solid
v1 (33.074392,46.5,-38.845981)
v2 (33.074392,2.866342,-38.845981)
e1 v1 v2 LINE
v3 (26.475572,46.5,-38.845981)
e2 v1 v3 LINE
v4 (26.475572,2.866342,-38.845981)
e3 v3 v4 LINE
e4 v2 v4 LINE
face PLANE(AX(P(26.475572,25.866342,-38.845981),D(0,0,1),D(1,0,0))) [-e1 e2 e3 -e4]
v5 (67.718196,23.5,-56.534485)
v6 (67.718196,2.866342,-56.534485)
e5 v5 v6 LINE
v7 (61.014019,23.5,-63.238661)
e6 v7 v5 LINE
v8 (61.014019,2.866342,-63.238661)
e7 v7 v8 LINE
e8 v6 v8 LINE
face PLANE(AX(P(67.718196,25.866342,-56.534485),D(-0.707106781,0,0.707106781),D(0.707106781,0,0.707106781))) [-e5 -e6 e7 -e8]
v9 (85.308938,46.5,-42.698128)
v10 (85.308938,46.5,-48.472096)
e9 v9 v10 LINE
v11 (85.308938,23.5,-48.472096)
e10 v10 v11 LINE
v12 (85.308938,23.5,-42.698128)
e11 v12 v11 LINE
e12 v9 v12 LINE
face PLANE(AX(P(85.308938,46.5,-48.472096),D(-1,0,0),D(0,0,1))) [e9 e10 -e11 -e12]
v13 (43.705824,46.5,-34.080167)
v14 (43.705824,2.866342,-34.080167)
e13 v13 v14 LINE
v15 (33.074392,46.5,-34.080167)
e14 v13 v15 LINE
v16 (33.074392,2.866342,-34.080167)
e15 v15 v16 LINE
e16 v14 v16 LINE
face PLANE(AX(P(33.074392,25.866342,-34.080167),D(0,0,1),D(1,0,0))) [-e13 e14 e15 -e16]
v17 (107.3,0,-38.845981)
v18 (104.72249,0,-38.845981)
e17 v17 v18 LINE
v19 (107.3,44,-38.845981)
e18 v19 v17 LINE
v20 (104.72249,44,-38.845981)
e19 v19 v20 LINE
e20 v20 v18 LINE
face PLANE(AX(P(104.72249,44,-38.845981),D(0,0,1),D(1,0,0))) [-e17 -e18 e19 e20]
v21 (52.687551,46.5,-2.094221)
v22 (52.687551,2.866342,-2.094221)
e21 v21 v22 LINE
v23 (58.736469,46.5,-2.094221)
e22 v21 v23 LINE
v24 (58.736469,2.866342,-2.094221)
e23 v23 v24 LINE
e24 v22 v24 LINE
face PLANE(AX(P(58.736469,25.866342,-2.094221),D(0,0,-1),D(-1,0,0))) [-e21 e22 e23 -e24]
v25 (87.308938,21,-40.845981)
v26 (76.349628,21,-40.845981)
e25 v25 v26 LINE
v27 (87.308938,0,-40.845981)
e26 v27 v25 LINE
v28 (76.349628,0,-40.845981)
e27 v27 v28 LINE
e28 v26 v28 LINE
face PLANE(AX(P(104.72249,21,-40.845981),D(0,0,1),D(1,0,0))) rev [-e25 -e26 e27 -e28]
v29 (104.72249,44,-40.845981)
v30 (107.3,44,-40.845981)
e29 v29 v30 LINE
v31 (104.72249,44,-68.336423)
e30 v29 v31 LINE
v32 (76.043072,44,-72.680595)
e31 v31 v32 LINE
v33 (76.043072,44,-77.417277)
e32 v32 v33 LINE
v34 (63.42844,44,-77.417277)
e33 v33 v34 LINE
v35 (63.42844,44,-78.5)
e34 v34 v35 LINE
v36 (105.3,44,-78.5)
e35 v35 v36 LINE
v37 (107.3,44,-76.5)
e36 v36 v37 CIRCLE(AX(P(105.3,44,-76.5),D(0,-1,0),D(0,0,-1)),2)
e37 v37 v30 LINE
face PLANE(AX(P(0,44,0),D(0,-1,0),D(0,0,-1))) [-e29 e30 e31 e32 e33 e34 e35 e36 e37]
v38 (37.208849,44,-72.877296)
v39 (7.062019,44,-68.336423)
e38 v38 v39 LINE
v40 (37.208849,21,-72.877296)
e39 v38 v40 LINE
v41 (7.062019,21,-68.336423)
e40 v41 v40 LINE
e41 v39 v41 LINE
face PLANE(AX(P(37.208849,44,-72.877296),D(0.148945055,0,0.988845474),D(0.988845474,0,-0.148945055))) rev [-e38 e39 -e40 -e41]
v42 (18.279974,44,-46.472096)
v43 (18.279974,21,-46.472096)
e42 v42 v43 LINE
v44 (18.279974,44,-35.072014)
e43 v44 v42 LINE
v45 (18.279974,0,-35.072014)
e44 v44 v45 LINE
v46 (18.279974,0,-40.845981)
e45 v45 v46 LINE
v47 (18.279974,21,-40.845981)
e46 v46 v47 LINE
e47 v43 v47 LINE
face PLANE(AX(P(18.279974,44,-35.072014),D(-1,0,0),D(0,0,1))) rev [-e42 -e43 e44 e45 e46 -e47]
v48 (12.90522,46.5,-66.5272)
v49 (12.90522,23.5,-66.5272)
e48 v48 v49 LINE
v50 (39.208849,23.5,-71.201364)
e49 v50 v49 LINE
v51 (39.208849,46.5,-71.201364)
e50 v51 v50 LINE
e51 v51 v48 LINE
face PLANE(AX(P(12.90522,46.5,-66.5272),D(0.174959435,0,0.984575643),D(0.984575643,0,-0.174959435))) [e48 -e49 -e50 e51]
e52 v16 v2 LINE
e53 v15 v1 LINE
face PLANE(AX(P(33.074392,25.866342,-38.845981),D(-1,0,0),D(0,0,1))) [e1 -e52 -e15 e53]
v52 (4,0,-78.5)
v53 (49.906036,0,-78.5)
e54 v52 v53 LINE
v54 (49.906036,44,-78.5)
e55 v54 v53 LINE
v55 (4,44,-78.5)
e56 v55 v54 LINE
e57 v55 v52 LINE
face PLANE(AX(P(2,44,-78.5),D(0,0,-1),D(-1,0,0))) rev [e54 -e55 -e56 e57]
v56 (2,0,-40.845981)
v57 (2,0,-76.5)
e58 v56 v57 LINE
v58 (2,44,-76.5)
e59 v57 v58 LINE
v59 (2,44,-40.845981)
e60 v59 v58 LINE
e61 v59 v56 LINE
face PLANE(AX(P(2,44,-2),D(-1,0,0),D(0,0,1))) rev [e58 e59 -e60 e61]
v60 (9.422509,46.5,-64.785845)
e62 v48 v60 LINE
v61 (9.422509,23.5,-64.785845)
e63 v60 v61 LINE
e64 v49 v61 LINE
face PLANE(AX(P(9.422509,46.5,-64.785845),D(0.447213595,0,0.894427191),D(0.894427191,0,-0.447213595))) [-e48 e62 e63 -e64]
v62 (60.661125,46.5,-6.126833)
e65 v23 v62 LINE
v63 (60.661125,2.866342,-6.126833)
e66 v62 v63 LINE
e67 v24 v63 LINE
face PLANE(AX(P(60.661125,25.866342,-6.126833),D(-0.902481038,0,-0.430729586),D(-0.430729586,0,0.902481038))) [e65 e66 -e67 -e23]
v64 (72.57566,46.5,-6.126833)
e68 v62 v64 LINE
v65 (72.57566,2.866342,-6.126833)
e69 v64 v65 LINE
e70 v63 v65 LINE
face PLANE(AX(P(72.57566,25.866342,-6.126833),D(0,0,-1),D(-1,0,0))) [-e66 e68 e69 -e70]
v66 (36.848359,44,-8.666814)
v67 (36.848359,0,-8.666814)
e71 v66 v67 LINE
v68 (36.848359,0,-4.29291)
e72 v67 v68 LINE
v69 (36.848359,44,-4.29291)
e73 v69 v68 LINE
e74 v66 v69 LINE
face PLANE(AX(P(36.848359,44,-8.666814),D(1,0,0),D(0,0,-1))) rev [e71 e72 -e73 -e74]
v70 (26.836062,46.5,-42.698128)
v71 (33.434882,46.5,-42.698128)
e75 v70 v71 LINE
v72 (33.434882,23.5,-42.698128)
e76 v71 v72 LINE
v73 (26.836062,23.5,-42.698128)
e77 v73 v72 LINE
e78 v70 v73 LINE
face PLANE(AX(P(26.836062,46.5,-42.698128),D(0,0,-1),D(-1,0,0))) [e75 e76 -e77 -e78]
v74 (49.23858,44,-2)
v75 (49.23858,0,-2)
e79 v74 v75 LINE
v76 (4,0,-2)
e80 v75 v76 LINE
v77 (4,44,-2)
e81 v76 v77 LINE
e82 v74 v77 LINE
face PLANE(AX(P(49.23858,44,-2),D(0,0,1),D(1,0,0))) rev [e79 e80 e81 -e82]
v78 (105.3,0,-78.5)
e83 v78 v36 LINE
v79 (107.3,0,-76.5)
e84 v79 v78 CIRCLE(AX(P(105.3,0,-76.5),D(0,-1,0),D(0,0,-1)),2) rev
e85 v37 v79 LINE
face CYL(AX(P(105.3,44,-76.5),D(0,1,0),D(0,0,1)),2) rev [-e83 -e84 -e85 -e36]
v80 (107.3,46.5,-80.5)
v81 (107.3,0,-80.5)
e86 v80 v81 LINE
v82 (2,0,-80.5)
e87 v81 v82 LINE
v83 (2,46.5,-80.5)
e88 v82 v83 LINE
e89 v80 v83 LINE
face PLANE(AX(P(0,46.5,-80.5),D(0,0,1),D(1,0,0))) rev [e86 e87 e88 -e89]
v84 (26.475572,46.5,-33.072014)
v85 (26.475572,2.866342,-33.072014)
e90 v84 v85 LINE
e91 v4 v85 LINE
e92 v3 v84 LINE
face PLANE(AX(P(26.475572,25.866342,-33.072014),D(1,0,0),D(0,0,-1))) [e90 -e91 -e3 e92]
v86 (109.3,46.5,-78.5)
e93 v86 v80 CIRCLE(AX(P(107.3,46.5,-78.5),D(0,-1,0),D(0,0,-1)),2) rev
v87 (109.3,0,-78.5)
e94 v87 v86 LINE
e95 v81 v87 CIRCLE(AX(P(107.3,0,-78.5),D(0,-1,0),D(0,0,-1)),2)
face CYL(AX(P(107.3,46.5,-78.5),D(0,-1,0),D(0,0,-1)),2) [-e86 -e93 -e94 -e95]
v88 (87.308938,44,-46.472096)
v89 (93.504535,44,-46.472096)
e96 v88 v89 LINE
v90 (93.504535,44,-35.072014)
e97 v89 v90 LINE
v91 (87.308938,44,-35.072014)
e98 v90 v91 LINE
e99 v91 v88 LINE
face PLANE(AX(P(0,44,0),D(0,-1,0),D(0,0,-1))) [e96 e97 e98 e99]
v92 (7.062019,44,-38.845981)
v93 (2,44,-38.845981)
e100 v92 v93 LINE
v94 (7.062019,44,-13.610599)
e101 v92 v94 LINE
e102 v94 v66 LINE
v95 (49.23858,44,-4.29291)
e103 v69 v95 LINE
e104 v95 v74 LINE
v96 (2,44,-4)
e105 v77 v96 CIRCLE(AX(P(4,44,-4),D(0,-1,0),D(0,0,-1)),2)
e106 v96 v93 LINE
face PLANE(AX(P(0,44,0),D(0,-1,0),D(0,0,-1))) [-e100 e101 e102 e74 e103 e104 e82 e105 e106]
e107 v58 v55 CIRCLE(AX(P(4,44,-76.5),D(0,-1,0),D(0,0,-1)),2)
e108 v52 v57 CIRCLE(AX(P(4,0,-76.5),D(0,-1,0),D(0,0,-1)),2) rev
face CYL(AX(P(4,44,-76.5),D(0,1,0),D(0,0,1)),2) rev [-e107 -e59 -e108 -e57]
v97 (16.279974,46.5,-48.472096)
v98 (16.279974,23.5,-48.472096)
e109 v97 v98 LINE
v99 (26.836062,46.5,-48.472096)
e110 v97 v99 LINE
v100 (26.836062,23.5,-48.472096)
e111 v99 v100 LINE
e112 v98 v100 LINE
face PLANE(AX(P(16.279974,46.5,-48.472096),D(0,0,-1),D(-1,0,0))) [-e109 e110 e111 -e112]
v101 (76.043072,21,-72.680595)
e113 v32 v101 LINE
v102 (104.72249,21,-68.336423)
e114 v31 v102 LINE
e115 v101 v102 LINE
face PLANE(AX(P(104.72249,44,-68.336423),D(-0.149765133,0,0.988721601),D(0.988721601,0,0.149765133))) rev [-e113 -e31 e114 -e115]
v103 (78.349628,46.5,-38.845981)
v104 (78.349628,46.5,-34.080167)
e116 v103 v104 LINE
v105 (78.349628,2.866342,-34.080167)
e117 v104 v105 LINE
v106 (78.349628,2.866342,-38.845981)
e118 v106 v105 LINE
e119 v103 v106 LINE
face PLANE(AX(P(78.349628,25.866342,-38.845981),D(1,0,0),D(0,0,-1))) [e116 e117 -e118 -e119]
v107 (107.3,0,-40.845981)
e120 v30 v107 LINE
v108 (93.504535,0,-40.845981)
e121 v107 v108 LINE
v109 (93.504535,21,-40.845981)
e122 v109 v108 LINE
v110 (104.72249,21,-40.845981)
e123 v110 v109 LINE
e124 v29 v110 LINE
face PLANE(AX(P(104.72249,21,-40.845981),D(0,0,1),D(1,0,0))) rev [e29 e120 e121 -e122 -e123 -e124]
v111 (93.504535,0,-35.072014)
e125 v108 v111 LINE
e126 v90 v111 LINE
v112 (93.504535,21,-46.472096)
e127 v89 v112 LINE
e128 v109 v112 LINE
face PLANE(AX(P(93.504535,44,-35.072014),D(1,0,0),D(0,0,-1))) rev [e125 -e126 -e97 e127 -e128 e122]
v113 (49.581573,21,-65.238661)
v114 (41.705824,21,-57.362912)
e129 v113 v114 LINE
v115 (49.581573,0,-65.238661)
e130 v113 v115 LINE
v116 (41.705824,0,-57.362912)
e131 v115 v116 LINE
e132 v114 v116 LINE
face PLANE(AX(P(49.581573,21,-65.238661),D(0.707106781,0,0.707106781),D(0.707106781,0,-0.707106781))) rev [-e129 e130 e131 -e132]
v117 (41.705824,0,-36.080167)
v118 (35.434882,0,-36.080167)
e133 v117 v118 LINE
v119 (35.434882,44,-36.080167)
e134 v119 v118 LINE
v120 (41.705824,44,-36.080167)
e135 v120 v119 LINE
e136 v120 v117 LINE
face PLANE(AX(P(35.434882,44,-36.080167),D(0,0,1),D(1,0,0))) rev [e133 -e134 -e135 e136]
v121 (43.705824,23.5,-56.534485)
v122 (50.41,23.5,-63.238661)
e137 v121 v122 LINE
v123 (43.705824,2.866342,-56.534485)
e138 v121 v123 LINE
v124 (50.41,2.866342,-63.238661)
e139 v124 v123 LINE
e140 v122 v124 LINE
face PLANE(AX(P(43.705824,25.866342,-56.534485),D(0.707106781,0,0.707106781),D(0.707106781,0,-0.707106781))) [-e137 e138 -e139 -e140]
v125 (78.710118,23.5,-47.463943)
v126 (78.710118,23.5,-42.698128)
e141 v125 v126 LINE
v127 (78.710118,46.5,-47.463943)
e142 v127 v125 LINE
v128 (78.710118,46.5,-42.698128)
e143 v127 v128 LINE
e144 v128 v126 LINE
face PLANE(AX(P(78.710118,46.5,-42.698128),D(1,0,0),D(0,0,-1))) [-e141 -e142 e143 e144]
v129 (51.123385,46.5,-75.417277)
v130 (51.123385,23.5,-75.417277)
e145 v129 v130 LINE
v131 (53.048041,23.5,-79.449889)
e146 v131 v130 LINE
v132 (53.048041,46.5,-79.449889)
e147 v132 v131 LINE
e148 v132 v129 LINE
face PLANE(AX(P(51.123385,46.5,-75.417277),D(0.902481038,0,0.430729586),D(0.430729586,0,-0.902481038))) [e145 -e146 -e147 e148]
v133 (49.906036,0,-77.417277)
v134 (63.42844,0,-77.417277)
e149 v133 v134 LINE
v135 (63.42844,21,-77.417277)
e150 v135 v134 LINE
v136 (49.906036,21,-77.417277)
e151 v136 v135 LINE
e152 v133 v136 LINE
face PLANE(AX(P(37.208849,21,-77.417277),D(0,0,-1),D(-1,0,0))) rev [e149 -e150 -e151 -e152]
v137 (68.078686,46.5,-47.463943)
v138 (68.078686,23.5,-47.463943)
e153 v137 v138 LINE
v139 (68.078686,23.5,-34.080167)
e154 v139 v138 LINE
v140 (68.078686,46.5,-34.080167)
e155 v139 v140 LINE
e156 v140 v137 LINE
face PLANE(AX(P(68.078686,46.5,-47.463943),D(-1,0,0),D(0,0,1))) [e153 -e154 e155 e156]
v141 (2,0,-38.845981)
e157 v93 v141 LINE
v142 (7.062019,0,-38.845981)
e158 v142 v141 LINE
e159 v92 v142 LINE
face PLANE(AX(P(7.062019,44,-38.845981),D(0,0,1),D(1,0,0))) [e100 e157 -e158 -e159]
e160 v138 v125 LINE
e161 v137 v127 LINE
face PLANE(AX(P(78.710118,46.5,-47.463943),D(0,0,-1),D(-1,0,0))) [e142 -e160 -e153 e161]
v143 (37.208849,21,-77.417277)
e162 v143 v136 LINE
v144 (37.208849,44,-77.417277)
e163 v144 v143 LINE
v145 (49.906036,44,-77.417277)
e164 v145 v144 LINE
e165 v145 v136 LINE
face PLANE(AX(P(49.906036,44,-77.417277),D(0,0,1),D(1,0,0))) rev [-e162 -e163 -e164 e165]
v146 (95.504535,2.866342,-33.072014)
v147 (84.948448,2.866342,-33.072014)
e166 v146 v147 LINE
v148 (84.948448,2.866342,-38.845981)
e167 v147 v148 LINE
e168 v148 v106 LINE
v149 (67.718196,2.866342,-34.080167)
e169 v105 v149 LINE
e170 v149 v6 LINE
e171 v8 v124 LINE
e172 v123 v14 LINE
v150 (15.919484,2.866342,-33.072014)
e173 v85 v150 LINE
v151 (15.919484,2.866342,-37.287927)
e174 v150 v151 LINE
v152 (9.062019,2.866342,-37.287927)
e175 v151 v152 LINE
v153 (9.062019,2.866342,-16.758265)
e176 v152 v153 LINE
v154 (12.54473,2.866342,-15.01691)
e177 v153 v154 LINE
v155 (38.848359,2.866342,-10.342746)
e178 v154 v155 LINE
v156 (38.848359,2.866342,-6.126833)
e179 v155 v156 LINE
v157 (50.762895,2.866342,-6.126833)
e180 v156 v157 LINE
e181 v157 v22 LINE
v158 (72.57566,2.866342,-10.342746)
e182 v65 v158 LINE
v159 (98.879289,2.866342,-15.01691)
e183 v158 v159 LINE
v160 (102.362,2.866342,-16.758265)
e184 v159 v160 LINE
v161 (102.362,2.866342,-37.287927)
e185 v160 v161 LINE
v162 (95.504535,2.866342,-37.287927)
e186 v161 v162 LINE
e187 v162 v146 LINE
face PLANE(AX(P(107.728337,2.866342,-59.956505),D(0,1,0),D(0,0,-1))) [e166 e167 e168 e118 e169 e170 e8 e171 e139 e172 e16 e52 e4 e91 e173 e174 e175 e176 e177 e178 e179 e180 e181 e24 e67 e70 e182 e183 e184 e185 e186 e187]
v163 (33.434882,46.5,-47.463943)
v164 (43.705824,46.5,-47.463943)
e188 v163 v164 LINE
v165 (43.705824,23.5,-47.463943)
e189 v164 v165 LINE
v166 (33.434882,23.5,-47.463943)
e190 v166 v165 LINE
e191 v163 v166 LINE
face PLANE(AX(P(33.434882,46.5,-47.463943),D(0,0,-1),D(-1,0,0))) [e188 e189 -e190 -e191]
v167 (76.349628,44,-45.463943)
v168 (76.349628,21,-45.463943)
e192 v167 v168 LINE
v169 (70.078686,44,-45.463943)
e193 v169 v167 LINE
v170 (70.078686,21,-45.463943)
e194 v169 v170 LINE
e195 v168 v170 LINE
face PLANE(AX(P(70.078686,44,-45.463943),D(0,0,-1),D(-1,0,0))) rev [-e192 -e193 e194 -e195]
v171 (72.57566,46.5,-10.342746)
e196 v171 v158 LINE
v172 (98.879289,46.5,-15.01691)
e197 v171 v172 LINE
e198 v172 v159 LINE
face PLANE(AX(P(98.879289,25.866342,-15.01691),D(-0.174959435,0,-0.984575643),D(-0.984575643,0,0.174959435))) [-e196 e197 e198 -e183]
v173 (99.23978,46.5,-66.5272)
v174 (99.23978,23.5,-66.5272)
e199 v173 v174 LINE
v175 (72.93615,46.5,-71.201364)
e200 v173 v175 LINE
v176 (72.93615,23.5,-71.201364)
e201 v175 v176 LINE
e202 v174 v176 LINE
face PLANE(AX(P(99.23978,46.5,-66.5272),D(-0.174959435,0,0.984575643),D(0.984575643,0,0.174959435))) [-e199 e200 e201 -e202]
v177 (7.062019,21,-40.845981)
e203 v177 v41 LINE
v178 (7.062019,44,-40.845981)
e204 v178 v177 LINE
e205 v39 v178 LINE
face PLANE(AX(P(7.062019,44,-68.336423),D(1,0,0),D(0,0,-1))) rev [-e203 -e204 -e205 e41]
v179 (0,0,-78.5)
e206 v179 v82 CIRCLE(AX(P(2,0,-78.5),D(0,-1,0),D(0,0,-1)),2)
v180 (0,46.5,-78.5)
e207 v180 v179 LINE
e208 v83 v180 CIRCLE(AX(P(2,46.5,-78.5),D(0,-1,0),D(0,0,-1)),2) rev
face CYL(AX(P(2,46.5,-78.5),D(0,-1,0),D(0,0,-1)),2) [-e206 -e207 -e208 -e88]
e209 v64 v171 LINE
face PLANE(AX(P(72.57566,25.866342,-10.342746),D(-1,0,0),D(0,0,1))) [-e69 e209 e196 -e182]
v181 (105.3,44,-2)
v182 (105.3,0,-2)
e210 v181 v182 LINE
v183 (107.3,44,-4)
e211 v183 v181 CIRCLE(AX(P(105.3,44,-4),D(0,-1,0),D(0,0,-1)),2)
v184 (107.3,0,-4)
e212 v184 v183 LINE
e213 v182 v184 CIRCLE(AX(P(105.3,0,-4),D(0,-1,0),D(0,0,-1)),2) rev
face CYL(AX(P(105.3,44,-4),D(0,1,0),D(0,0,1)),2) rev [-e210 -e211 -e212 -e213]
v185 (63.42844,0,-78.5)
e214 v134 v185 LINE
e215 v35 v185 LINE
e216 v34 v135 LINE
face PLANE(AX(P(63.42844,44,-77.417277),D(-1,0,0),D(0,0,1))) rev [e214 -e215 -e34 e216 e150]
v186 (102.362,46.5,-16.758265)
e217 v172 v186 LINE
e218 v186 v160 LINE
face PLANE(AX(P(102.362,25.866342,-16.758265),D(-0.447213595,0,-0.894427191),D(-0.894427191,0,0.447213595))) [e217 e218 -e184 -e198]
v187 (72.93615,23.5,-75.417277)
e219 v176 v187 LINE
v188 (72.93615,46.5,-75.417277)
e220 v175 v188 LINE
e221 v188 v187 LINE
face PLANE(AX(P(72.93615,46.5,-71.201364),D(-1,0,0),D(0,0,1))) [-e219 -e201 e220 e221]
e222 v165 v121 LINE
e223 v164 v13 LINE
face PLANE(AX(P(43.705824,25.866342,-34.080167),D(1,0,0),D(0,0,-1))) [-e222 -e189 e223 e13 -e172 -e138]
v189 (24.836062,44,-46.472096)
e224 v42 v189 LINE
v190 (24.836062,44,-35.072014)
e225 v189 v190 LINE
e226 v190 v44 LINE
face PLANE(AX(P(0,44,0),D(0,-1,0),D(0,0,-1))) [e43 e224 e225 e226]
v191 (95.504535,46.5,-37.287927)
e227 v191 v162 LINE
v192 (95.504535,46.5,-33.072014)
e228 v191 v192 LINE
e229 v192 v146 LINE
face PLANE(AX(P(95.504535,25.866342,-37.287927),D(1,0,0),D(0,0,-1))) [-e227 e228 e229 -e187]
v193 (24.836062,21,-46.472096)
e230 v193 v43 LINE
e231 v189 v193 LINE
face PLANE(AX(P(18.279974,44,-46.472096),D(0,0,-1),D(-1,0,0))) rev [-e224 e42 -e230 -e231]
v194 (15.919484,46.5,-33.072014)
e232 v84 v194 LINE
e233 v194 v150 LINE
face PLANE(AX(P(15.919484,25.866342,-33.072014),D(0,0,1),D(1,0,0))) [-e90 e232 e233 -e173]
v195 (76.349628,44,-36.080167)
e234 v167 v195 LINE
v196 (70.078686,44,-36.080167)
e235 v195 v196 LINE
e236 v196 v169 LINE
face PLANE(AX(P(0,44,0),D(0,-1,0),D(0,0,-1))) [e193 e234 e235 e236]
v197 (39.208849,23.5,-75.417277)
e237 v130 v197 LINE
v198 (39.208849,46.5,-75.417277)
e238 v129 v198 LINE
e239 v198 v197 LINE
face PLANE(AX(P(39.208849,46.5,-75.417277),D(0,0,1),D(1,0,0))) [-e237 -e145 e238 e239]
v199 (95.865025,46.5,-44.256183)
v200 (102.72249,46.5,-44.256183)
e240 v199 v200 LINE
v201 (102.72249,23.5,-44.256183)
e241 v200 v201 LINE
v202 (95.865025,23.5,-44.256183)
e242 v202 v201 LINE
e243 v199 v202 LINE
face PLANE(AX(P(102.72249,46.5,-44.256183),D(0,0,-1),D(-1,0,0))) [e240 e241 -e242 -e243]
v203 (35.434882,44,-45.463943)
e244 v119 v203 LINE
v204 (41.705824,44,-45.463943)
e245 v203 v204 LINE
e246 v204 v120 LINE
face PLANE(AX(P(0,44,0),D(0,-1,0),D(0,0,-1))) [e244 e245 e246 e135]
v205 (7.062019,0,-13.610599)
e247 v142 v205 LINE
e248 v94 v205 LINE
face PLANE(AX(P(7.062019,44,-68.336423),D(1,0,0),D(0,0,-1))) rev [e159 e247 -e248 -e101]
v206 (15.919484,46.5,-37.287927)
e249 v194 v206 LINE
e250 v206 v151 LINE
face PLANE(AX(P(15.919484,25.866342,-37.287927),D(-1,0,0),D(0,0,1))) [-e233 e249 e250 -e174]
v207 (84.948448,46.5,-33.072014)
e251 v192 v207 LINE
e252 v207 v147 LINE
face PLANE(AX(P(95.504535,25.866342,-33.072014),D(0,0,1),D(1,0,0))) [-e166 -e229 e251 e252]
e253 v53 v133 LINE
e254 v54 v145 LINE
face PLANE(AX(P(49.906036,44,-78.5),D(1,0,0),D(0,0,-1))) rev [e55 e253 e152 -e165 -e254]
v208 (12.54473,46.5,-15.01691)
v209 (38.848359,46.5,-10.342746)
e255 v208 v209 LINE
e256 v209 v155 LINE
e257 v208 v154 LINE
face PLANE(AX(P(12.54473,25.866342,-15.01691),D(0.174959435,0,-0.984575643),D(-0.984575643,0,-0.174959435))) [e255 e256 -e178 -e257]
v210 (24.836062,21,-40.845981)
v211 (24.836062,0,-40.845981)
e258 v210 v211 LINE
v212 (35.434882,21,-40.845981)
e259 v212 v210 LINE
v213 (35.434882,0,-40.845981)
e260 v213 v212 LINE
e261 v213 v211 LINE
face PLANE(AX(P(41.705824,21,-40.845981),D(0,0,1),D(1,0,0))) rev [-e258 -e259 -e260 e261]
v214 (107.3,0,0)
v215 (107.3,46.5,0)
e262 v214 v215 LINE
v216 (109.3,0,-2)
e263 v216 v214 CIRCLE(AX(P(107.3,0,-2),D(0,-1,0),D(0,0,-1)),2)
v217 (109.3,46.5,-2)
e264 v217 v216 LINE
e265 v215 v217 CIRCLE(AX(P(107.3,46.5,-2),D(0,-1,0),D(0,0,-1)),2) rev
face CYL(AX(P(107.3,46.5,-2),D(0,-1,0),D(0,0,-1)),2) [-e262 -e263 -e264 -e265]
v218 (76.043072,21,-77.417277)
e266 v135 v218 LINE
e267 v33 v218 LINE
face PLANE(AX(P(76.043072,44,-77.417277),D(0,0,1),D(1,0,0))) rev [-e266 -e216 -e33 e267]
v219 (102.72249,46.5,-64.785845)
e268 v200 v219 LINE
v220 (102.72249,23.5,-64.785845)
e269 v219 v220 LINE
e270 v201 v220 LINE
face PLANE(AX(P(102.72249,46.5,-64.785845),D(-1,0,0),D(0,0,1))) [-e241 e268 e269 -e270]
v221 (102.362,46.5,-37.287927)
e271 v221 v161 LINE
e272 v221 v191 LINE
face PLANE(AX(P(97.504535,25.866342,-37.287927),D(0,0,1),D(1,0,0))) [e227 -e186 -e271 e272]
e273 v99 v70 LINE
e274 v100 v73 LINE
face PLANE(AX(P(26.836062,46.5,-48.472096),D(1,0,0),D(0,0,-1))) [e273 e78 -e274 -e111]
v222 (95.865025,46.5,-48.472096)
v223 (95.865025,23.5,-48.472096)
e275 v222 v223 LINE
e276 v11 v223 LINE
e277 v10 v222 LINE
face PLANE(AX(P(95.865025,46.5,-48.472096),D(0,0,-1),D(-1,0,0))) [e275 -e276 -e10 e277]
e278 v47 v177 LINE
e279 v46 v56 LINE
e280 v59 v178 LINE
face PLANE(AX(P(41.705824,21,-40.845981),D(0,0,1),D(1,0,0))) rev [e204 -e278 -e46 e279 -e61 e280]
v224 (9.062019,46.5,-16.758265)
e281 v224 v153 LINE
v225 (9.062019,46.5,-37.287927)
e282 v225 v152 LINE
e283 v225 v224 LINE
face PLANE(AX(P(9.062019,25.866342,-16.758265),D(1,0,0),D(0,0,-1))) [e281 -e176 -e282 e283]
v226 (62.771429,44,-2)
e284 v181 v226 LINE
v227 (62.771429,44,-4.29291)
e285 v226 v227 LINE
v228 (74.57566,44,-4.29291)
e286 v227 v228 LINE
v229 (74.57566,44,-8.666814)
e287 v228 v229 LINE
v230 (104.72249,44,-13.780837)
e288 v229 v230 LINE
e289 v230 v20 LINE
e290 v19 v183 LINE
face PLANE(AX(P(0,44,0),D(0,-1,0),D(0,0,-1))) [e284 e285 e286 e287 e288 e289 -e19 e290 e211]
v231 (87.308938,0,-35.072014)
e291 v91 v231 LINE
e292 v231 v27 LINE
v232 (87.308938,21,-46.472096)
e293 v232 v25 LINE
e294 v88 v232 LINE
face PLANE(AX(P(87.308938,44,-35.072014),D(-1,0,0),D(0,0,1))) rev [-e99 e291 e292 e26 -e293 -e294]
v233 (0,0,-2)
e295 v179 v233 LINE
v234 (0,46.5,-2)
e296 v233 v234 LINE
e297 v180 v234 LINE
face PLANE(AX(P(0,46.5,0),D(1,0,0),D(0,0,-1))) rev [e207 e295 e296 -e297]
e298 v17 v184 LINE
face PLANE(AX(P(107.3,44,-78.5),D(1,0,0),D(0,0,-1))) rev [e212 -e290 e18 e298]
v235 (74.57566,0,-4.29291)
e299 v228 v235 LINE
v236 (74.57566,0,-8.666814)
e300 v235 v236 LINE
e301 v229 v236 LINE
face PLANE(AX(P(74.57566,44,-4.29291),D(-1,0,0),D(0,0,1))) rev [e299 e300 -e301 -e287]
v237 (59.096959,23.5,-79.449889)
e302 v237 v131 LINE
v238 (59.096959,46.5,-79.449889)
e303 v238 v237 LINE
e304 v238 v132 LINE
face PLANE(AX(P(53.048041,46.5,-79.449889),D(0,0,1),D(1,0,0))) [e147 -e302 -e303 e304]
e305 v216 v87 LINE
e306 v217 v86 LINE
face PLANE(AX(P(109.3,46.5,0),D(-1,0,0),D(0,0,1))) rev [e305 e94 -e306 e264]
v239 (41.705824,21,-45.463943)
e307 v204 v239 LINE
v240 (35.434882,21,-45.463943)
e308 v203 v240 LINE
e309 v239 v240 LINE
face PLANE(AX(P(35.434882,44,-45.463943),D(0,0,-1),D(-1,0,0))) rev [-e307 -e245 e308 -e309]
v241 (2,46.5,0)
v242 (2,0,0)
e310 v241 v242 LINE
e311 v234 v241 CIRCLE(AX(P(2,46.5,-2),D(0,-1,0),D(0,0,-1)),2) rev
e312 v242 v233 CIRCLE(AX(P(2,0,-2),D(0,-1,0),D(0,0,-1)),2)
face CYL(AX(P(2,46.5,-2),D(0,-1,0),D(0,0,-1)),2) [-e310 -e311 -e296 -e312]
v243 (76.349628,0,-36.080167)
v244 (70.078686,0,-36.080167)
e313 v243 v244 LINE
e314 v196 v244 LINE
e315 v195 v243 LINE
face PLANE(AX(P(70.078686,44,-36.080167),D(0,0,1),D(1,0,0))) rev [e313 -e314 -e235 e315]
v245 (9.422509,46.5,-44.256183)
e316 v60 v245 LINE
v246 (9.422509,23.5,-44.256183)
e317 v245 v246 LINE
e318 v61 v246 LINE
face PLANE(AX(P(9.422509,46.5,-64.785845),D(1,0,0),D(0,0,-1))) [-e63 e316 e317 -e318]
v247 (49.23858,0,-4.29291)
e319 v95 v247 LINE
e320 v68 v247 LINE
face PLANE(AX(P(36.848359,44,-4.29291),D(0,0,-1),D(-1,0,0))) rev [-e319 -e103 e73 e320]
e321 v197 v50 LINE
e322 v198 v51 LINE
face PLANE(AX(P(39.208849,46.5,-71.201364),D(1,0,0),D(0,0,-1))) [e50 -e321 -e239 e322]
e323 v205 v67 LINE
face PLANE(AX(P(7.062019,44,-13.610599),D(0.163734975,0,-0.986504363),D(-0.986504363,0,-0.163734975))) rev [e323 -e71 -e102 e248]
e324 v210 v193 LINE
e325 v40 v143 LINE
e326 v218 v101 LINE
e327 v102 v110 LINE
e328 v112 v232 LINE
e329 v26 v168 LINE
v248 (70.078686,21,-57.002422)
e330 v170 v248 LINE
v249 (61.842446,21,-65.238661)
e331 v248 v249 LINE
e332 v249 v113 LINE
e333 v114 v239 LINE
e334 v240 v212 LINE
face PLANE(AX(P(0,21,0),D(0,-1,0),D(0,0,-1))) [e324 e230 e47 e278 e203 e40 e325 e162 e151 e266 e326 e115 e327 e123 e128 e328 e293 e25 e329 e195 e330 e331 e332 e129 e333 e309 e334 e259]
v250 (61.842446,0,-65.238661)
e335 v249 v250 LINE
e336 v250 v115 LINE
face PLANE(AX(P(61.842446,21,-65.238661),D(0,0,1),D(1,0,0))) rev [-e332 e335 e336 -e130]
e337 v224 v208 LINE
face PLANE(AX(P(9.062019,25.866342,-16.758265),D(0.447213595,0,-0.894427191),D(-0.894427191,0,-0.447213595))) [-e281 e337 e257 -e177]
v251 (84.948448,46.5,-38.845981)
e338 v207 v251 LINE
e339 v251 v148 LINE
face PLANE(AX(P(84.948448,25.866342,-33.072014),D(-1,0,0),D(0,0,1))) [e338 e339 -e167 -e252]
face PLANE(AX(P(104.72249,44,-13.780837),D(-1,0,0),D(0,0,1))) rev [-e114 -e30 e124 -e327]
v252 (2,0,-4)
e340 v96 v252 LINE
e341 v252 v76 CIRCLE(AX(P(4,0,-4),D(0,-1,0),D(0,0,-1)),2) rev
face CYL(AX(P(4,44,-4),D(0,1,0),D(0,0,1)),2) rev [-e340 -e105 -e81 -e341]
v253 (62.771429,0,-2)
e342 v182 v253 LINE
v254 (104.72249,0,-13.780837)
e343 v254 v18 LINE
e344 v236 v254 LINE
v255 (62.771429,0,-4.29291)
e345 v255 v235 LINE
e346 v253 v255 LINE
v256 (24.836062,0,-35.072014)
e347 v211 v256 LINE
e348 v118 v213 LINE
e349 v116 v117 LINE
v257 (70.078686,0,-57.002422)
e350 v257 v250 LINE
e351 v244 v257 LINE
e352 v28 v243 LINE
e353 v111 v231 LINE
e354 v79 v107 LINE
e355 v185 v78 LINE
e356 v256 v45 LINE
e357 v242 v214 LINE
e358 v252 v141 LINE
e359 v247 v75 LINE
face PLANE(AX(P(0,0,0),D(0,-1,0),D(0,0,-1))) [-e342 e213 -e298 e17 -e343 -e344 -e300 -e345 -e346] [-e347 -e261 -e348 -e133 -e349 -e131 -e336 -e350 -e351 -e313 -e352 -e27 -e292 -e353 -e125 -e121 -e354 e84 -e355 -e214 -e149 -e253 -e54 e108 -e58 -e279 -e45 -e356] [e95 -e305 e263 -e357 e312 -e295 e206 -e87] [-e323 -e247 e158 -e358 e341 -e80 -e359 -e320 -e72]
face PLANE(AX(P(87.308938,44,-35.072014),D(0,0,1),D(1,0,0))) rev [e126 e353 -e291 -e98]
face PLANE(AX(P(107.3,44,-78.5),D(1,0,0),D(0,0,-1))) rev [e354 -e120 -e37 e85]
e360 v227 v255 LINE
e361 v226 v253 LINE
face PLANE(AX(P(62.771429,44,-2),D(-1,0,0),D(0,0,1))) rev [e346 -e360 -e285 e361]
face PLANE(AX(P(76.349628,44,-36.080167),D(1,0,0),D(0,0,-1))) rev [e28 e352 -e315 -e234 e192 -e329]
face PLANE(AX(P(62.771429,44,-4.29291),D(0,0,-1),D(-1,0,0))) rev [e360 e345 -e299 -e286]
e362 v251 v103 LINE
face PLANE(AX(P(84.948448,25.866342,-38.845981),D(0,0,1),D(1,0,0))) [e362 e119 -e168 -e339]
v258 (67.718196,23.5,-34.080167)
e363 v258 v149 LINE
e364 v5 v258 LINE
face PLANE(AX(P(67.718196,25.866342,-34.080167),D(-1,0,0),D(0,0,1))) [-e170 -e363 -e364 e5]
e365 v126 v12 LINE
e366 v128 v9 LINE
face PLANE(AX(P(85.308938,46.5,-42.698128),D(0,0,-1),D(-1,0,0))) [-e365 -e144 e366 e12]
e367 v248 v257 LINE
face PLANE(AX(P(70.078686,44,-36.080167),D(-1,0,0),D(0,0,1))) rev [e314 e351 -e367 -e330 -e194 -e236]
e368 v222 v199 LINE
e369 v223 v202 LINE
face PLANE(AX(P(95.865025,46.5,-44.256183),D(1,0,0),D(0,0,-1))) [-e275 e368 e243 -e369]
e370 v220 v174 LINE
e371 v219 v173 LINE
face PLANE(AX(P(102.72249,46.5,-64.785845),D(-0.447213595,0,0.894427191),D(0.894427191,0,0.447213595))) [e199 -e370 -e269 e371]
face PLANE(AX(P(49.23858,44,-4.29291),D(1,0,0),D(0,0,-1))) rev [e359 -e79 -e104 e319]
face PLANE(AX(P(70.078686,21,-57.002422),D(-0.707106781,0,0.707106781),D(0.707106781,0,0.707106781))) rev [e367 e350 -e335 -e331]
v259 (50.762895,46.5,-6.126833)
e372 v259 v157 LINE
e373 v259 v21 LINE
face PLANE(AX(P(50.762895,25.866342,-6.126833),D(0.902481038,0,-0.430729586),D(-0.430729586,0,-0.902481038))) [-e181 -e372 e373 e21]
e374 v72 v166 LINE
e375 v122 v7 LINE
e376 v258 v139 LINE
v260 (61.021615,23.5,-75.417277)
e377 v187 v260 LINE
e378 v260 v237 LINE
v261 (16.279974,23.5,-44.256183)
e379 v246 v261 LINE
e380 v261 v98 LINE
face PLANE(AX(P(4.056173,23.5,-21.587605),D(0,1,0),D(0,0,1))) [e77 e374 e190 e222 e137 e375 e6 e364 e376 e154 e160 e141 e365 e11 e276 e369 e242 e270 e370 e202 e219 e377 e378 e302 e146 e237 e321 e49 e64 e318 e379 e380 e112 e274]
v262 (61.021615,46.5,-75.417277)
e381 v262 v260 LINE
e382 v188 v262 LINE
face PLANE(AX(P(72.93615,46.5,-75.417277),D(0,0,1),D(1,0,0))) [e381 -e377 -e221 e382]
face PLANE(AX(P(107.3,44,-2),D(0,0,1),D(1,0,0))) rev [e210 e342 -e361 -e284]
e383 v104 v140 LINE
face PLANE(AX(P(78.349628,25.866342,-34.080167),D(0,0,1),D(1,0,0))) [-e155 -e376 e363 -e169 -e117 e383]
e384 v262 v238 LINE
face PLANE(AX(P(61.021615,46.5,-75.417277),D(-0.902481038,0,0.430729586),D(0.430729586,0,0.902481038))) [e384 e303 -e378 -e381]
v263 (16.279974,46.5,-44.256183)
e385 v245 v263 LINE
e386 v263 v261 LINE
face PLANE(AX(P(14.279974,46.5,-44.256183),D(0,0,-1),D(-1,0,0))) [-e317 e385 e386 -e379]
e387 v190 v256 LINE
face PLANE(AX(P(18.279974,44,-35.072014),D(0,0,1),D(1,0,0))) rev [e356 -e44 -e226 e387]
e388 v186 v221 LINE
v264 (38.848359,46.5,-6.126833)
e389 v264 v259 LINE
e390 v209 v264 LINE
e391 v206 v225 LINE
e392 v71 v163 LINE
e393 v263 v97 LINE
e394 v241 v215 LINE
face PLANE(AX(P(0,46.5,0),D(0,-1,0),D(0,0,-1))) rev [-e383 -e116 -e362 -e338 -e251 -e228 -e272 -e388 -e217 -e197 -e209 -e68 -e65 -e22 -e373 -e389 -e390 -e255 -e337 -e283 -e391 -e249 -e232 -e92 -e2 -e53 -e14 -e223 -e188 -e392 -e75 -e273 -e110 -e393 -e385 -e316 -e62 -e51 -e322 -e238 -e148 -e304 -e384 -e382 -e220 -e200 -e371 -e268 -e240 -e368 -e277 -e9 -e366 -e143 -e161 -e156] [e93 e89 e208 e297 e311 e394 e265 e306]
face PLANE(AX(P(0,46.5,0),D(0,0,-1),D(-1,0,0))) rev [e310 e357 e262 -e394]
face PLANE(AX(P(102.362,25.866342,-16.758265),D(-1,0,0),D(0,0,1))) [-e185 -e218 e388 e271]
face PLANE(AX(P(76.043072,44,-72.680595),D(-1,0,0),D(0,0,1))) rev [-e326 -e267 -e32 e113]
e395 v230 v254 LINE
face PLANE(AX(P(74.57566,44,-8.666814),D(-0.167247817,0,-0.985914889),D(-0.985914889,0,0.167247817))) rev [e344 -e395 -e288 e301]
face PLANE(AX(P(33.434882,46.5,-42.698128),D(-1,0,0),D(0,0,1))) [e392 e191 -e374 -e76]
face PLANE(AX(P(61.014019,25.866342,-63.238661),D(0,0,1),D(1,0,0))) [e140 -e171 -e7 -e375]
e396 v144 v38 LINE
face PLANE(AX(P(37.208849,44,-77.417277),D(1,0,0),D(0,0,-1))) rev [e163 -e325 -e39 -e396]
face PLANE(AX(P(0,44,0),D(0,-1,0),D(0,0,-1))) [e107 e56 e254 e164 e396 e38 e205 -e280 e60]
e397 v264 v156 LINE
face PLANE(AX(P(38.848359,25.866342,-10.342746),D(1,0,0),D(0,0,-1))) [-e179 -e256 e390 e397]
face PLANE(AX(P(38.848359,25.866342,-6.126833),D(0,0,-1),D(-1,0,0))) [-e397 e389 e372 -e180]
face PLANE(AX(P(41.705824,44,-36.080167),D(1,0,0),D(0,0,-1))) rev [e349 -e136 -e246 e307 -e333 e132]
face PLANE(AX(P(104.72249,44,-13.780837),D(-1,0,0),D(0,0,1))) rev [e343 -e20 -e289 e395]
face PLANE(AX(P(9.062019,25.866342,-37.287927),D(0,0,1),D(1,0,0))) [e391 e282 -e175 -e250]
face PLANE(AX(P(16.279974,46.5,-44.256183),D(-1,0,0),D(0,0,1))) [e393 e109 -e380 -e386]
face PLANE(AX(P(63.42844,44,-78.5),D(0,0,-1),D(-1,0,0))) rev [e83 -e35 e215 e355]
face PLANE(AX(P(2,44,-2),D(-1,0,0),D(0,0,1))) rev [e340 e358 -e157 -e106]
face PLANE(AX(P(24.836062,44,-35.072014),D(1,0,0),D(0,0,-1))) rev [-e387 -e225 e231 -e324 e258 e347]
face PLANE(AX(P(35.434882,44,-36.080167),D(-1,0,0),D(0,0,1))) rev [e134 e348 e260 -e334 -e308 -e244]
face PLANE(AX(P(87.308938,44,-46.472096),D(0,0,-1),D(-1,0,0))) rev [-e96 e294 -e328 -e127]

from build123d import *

# Parameters (mm, degrees)
SKETCH1_W             = 109.3
SKETCH1_H             = 80.5
BOSS_EXTRUDE3_DEPTH   = 46.5
FILLET2_R             = 2
FILLET3_R             = 2
FILLET4_R             = 2
FILLET5_R             = 2
K_WING_BLANK_START    = -12.90763076
K_WING_BLANK_DEPTH    = 23
BODY_MOVE_COPY6_ANGLE = 180
SKETCH5_W             = 6.556087763
SKETCH5_H             = 11.400081804
SKETCH5_W_2           = 6.270941902
SKETCH5_H_2           = 9.38377574
SKETCH5_W_3           = 6.195597691
CUT_EXTRUDE3_DEPTH    = 44
CUT_EXTRUDE4_DEPTH    = 21
FILLET7_R             = 2
SKETCH8_W             = 5.062019344
SKETCH8_H             = 2
SKETCH8_W_2           = 2.577509977
BOSS_EXTRUDE5_DEPTH   = 44


with BuildPart() as part:
    # Sketch1 → Boss-Extrude3 (new body)
    with BuildSketch(Plane(origin=(0, 0, 0), x_dir=(1, 0, 0), z_dir=(0, 1, 0))):
        with Locations((54.65, 40.25)):
            Rectangle(SKETCH1_W, SKETCH1_H)
    extrude(amount=BOSS_EXTRUDE3_DEPTH)

    # Fillet2
    fillet2_edges = [part.edges().sort_by_distance(p)[0] for p in [
        (109.3, 23.25, 0),
    ]]
    fillet(fillet2_edges, radius=FILLET2_R)

    # Fillet3
    fillet3_edges = [part.edges().sort_by_distance(p)[0] for p in [
        (0, 23.25, 0),
    ]]
    fillet(fillet3_edges, radius=FILLET3_R)

    # Fillet4
    fillet4_edges = [part.edges().sort_by_distance(p)[0] for p in [
        (109.3, 23.25, -80.5),
    ]]
    fillet(fillet4_edges, radius=FILLET4_R)

    # Fillet5
    fillet5_edges = [part.edges().sort_by_distance(p)[0] for p in [
        (0, 23.25, -80.5),
    ]]
    fillet(fillet5_edges, radius=FILLET5_R)


with BuildPart() as body_2:
    # K-Wing_Blank: read off the stored shape, not the designer's step
    # K-Wing_Blank outline → K-Wing_Blank (new body)
    with BuildSketch(Plane(origin=(0, 0, 0), x_dir=(1, 0, 0), z_dir=(0, 1, 0)).offset(K_WING_BLANK_START)):
        Polygon((-105.401168796, 111.360944086), (-105.401168796, 90.831282342), (-98.543704187, 90.831282342), (-98.543704187, 95.047195022), (-87.987616423, 95.047195022), (-87.987616423, 89.273227656), (-81.388796577, 89.273227656), (-81.388796577, 94.03904199), (-70.757364602, 94.03904199), (-70.757364602, 71.584724457), (-64.053188187, 64.880548042), (-53.449168798, 64.880548042), (-46.744992383, 71.584724457), (-46.744992383, 94.03904199), (-36.113560409, 94.03904199), (-36.113560409, 89.273227656), (-29.514740562, 89.273227656), (-29.514740562, 95.047195022), (-18.958652799, 95.047195022), (-18.958652799, 90.831282342), (-12.10118819, 90.831282342), (-12.10118819, 111.360944086), (-15.583898664, 113.102299324), (-41.887527774, 117.776463381), (-41.887527774, 121.992376061), (-53.802063608, 121.992376061), (-55.726719397, 126.024988189), (-61.775637589, 126.024988189), (-63.700293378, 121.992376061), (-75.614829211, 121.992376061), (-75.614829211, 117.776463381), (-101.918458321, 113.102299324), align=None)
    extrude(amount=K_WING_BLANK_DEPTH)


with BuildPart() as body_2_1:
    # Body-Move/Copy2: read off the stored shape, not the designer's step
    # Body-Move/Copy2: moved
    add(body_2.part.moved(Location((0, 36.4076308, 0))))


with BuildPart() as body_3:
    # Body-Move/Copy3: copy of body 2
    add(body_2_1.part.moved(Location((114.823678212, 0, 43.931811975))))


with BuildPart() as body_4:
    # Body-Move/Copy4: copy of body 2
    add(body_2_1.part.moved(Location((0, 20.633658037, 0))))


with BuildPart() as body_2_2:
    add(body_2_1.part)

    # Combine1: union body 4
    add(body_4.part)


with BuildPart() as body_2_3:
    # Body-Move/Copy6: moved
    add(body_2_2.part.rotate(Axis((-58.751178493, 0, -95.452768116), (0, 1, 0)), BODY_MOVE_COPY6_ANGLE))


with BuildPart() as body_2_4:
    # Body-Move/Copy8: moved
    add(body_2_3.part.moved(Location((114.46318814, 0, 60.098511736))))


with BuildPart() as body_3_1:
    # Body-Move/Copy9: moved
    add(body_3.part.moved(Location((0, 0, 2.643287199))))


with BuildPart() as body_2_5:
    # Body-Move/Copy10: moved
    add(body_2_4.part.moved(Location((0, 0, 2.68781543))))


with BuildPart() as body_2_6:
    # Body-Move/Copy11: read off the stored shape, not the designer's step
    # Body-Move/Copy11: moved
    add(body_2_5.part.moved(Location((0, -20.633658, 0))))


with BuildPart() as part_1:
    add(part.part)

    # Intersect3: read off the stored shape, not the designer's step
    # Intersect3: cut body 2, body 3
    add(body_2_6.part, mode=Mode.SUBTRACT)
    add(body_3_1.part, mode=Mode.SUBTRACT)

    # Sketch5 → Cut-Extrude3 (cut)
    with BuildSketch(Plane(origin=(0, 0, 0), x_dir=(-1, 0, 0), z_dir=(0, -1, 0))):
        Polygon((-63.428440073, 77.417276886), (-63.428440073, 78.5), (-107.3, 78.5), (-107.3, 2), (-62.771429167, 2), (-62.771429167, 4.292909509), (-74.575660365, 4.292909509), (-74.575660365, 8.66681439), (-104.722490023, 13.780837435), (-104.722490023, 68.336423007), (-76.04307152, 72.680595238), (-76.04307152, 77.417276886), align=None)
        with Locations((-21.558017908, 40.772054945)):
            Rectangle(SKETCH5_W, SKETCH5_H)
        with Locations((-38.570352587, 40.772054945)):
            Rectangle(SKETCH5_W_2, SKETCH5_H_2)
        with Locations((-73.21415678, 40.772054945)):
            Rectangle(SKETCH5_W_2, SKETCH5_H_2)
        with Locations((-90.406736496, 40.772054945)):
            Rectangle(SKETCH5_W_3, SKETCH5_H)
        Polygon((-49.906036037, 78.5), (-49.906036037, 77.417276886), (-37.208849001, 77.417276886), (-37.208849001, 72.8772955), (-7.062019344, 68.336423007), (-7.062019344, 13.610599493), (-36.848358928, 8.66681439), (-36.848358928, 4.292909509), (-49.238580109, 4.292909509), (-49.238580109, 2), (-2, 2), (-2, 78.5), align=None)
    extrude(amount=-CUT_EXTRUDE3_DEPTH, mode=Mode.SUBTRACT)

    # Sketch6 → Cut-Extrude4 (cut)
    with BuildSketch(Plane(origin=(0, 0, 0), x_dir=(-1, 0, 0), z_dir=(0, -1, 0))):
        Polygon((-41.705823538, 40.845981409), (-7.062019344, 40.845981409), (-7.062019344, 68.336423007), (-37.208849001, 72.8772955), (-37.208849001, 77.417276886), (-76.04307152, 77.417276886), (-76.04307152, 72.680595238), (-104.722490023, 68.336423007), (-104.722490023, 40.845981409), (-70.078685829, 40.845981409), (-70.078685829, 57.00242166), (-61.842446466, 65.238661023), (-49.581572828, 65.238661023), (-41.705823538, 57.362911733), align=None)
    extrude(amount=-CUT_EXTRUDE4_DEPTH, mode=Mode.SUBTRACT)

    # Fillet7
    fillet7_edges = [part_1.edges().sort_by_distance(p)[0] for p in [
        (107.3, 22, -2),
        (107.3, 22, -78.5),
        (2, 22, -78.5),
        (2, 22, -2),
    ]]
    fillet(fillet7_edges, radius=FILLET7_R)

    # Sketch8 → Boss-Extrude5 (add)
    with BuildSketch(Plane(origin=(0, 0, 0), x_dir=(-1, 0, 0), z_dir=(0, -1, 0))):
        with Locations((-4.531009672, 39.845981409)):
            Rectangle(SKETCH8_W, SKETCH8_H)
        with Locations((-106.011245012, 39.845981409)):
            Rectangle(SKETCH8_W_2, SKETCH8_H)
    extrude(amount=-BOSS_EXTRUDE5_DEPTH)


solid = part_1.part
